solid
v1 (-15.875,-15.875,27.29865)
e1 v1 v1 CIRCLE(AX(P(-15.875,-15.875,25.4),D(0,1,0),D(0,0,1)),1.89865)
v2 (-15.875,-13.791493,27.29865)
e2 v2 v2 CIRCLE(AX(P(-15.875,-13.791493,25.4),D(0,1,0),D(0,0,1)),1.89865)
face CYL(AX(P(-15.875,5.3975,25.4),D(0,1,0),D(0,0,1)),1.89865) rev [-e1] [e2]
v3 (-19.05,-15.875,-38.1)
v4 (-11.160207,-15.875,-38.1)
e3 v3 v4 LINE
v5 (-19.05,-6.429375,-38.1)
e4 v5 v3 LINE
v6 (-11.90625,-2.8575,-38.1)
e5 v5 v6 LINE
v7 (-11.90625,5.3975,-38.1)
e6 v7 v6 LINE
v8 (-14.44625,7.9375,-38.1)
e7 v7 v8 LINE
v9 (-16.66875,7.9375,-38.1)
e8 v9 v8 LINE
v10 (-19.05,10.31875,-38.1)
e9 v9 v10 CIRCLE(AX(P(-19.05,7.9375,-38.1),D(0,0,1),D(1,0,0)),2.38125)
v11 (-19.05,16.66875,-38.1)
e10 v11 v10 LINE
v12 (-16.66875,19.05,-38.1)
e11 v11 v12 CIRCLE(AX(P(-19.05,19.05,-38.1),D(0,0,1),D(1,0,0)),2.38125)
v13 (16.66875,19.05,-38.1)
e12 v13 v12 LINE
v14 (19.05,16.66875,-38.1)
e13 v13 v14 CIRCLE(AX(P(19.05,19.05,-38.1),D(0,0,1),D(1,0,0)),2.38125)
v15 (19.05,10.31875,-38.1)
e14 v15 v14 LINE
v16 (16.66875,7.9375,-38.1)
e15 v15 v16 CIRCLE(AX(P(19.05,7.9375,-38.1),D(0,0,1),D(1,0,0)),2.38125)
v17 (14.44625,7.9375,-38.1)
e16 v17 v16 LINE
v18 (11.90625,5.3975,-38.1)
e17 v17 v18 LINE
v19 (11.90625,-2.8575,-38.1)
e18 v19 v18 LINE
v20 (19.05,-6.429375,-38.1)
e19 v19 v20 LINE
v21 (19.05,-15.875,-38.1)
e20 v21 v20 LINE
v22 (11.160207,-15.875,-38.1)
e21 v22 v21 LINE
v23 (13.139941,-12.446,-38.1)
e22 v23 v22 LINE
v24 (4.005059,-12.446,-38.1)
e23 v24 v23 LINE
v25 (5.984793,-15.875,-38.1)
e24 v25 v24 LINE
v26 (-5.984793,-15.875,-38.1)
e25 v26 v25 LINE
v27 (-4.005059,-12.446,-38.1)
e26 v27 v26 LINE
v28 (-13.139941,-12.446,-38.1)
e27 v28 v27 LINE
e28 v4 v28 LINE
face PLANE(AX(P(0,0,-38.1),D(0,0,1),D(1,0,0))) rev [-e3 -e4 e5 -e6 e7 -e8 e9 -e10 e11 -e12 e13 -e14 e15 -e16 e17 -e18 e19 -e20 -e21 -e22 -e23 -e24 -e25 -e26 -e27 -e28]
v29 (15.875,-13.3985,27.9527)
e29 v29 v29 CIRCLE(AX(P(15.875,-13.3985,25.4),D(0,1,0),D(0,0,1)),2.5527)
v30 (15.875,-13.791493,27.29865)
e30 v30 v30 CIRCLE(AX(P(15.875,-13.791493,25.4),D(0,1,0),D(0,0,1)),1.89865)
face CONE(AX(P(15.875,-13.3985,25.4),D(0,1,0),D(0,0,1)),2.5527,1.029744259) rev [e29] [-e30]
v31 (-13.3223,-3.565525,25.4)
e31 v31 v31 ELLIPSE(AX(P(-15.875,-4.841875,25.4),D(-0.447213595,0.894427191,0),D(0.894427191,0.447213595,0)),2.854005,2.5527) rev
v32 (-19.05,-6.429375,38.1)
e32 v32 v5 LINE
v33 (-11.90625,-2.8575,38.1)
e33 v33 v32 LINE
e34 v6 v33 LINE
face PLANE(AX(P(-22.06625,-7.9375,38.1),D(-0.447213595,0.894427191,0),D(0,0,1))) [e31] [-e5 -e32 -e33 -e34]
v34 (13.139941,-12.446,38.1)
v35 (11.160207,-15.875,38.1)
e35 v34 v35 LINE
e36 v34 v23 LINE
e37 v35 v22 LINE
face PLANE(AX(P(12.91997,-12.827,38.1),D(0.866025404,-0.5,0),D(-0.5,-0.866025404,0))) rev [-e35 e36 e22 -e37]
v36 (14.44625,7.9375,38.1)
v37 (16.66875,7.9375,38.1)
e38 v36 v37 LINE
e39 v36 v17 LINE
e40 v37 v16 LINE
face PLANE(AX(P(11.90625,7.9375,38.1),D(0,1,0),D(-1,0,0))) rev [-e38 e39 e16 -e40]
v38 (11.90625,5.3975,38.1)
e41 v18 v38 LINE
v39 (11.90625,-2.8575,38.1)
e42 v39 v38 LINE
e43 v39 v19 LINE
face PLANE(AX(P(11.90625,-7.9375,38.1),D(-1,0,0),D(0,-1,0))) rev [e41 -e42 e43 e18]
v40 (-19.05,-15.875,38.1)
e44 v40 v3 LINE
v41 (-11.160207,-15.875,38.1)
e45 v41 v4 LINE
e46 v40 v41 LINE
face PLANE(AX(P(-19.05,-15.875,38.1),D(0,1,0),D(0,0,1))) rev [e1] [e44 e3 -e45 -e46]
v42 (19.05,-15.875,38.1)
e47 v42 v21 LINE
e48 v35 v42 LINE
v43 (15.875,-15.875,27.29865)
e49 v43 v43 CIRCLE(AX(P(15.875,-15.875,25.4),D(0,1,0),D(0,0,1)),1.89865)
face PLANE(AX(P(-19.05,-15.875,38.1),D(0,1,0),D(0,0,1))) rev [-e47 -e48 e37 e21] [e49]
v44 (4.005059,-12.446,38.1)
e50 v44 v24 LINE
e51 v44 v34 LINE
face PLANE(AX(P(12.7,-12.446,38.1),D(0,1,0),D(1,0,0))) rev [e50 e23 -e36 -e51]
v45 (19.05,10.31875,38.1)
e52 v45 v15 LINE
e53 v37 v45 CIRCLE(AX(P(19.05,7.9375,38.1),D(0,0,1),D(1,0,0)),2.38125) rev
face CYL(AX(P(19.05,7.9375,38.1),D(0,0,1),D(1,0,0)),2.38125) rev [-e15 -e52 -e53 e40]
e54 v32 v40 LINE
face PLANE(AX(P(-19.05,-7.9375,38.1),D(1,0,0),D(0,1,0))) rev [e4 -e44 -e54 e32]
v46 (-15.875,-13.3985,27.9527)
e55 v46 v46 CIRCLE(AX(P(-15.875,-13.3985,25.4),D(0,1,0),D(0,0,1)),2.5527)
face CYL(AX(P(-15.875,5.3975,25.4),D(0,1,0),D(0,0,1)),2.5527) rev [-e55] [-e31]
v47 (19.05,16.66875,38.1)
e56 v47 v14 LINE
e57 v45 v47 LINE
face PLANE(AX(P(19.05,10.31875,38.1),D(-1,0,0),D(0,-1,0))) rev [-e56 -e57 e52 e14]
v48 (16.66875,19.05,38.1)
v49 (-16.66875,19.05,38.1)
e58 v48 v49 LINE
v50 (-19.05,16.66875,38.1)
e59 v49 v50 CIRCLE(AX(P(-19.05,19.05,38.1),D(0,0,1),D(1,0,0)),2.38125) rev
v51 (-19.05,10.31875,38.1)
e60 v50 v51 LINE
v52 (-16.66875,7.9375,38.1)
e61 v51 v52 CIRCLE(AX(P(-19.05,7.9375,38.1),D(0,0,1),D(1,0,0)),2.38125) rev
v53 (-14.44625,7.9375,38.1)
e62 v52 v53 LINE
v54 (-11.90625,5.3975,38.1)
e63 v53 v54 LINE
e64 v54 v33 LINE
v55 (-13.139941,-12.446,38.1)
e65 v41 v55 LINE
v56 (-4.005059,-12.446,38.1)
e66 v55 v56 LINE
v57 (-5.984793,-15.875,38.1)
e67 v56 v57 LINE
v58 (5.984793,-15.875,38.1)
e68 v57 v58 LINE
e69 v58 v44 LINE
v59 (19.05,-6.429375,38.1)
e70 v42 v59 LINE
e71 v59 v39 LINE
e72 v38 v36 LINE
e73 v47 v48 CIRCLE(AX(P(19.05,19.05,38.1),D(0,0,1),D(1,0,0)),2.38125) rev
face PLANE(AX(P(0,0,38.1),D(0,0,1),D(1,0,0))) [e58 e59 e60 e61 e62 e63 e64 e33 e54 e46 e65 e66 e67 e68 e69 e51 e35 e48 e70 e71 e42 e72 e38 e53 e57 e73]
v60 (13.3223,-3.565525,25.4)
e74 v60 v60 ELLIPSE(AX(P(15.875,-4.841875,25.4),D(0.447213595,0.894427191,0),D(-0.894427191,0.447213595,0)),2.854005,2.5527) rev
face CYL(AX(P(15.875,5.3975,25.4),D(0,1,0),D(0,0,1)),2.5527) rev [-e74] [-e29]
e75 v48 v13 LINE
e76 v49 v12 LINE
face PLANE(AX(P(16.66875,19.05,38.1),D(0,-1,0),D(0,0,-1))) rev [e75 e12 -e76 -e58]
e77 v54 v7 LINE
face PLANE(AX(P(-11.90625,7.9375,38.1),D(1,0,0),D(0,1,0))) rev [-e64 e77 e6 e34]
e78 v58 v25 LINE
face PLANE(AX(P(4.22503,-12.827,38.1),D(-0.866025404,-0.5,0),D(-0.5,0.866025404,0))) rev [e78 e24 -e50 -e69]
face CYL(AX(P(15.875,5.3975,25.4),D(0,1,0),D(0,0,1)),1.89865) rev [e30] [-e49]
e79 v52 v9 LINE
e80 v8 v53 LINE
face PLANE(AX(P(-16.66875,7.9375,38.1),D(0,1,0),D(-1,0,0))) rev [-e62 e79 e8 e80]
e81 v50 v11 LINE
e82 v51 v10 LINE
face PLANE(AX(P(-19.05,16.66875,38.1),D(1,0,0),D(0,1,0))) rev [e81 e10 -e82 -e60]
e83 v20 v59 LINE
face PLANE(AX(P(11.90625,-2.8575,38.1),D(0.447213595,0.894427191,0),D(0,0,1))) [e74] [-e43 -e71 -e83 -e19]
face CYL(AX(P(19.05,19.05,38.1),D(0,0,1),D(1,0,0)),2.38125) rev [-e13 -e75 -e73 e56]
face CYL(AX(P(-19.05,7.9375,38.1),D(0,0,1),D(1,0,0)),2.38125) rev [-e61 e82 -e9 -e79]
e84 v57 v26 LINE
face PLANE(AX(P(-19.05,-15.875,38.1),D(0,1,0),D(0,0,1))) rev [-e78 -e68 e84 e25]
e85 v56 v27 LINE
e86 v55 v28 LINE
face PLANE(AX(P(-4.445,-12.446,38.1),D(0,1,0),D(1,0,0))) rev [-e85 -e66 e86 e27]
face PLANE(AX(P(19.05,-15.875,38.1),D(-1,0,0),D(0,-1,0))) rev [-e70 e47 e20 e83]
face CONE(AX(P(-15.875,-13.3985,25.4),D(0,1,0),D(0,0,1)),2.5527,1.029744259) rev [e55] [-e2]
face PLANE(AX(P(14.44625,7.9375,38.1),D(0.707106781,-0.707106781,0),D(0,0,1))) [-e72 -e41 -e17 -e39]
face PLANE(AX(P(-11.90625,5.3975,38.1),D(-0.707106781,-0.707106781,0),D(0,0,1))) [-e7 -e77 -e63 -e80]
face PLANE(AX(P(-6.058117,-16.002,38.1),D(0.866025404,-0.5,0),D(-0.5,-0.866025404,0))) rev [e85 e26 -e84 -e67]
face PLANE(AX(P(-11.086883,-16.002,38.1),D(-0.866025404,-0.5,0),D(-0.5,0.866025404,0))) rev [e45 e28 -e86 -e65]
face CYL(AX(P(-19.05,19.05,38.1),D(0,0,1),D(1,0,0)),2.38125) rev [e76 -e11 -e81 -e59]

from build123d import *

# Parameters (mm, degrees)
BOSS_EXTRU_1_DEPTH        = 38.1
CONG_1_R                  = 2.38125
CHANFREIN1_SIZE           = 10.16
CHANFREIN1_SIZE_2         = 5.08
CHANFREIN2_SIZE           = 10.16
CHANFREIN2_SIZE_2         = 5.08
CHANFREIN3_SIZE           = 2.54
EMPREINTE1_START          = -38.1
EMPREINTE1_DEPTH          = 76.2
D_PLACER_START            = -38.1
D_PLACER_LA_FACE1_DEPTH   = 76.2
ESQUISSE4_W               = 1.89865
ESQUISSE4_H               = 21.2725
D_GAGEMENT_61_AT_2_COUNT  = 2
D_GAGEMENT_61_AT_2_PITCH  = 31.75
D_GAGEMENT_101_AT_2_COUNT = 2
D_GAGEMENT_101_AT_2_PITCH = 31.75


# Read off the part's stored shape, not the designer's step: Empreinte1, Déplacer la face1
# Some blends are built 0.0001 mm under size
with BuildPart() as part:
    # Esquisse2 → Boss.-Extru.1 (new, symmetric)
    with BuildSketch(Plane.XY):
        Polygon((-19.05, -15.875), (19.05, -15.875), (19.05, -7.9375), (11.90625, -7.9375), (11.90625, 7.9375), (16.66875, 7.9375), (16.66875, 10.31875), (19.05, 10.31875), (19.05, 16.66875), (16.66875, 16.66875), (16.66875, 19.05), (-16.66875, 19.05), (-16.66875, 16.66875), (-19.05, 16.66875), (-19.05, 10.31875), (-16.66875, 10.31875), (-16.66875, 7.9375), (-11.90625, 7.9375), (-11.90625, -7.9375), (-19.05, -7.9375), align=None)
    extrude(amount=BOSS_EXTRU_1_DEPTH, both=True)

    # Congé1
    cong_1_edges = [part.edges().sort_by_distance(p)[0] for p in [
        (-16.66875, 16.66875, 0),
        (-16.66875, 10.31875, 0),
        (16.66875, 10.31875, 0),
        (16.66875, 16.66875, 0),
    ]]
    fillet(cong_1_edges, radius=CONG_1_R - 0.0001)  # a hair under: the kernel refuses the full size

    # Chanfrein1
    # the kernel refuses this chamfer: 10.16, 5.08 mm, written as the material it adds along each edge
    with BuildSketch(Plane(origin=(-11.90625, -7.9375, 38.1), x_dir=(-0.9998508956747119, -0.017268075123668056, 0), z_dir=(0, 0, -1))) as chanfrein1_piece_1_section:
        Polygon((CHANFREIN1_SIZE * 0.999850895675, CHANFREIN1_SIZE * 0.0172680751237), (-CHANFREIN1_SIZE_2 * 0.0172680751237, CHANFREIN1_SIZE_2 * 0.999850895675), (0, 0), align=None)
    chanfrein1_piece_1 = extrude(amount=76.2, mode=Mode.PRIVATE)
    chanfrein1_piece_1 = split(chanfrein1_piece_1, bisect_by=Plane(origin=(-19.05, -6.161924143, 0), z_dir=(1, 0, 0)), keep=Keep.TOP, mode=Mode.PRIVATE)
    add(chanfrein1_piece_1)

    # Chanfrein2
    # the kernel refuses this chamfer: 10.16, 5.08 mm, written as the material it adds along each edge
    with BuildSketch(Plane(origin=(11.90625, -7.9375, -38.1), x_dir=(0.9998508956747119, -0.017268075123668056, 0), z_dir=(0, 0, 1))) as chanfrein2_piece_1_section:
        Polygon((CHANFREIN2_SIZE * 0.999850895675, CHANFREIN2_SIZE * 0.0172680751237), (-CHANFREIN2_SIZE_2 * 0.0172680751237, CHANFREIN2_SIZE_2 * 0.999850895675), (0, 0), align=None)
    chanfrein2_piece_1 = extrude(amount=76.2, mode=Mode.PRIVATE)
    chanfrein2_piece_1 = split(chanfrein2_piece_1, bisect_by=Plane(origin=(19.05, -6.161924143, 0), z_dir=(-1, 0, 0)), keep=Keep.TOP, mode=Mode.PRIVATE)
    add(chanfrein2_piece_1)

    # Chanfrein3
    chanfrein3_edges = [part.edges().sort_by_distance(p)[0] for p in [
        (-11.90625, 7.9375, 0),
        (11.90625, 7.9375, 0),
    ]]
    chamfer(chanfrein3_edges, length=CHANFREIN3_SIZE)

    # Empreinte1 outline → Empreinte1 (cut)
    with BuildSketch(Plane.XY.offset(EMPREINTE1_START)):
        Polygon((-6.278087105, -15.875), (-4.445, -12.7), (-12.7, -12.7), (-10.866912895, -15.875), align=None)
        Polygon((4.445, -12.7), (6.278087105, -15.875), (10.866912895, -15.875), (12.7, -12.7), align=None)
    extrude(amount=EMPREINTE1_DEPTH, mode=Mode.SUBTRACT)

    # Déplacer la face1 outline → Déplacer la face1 (cut)
    with BuildSketch(Plane.XY.offset(D_PLACER_START)):
        Polygon((-5.984793168, -15.875), (-4.005059095, -12.446), (-13.139940905, -12.446), (-11.160206832, -15.875), (-10.866912895, -15.875), (-12.7, -12.7), (-4.445, -12.7), (-6.278087105, -15.875), align=None)
        Polygon((4.005059095, -12.446), (5.984793168, -15.875), (6.278087105, -15.875), (4.445, -12.7), (12.7, -12.7), (10.866912895, -15.875), (11.160206832, -15.875), (13.139940905, -12.446), align=None)
    extrude(amount=D_PLACER_LA_FACE1_DEPTH, mode=Mode.SUBTRACT)

    # Esquisse4 → Dégagement #61 (revolve, cut)
    with BuildSketch(Plane(origin=(-15.875, 5.3975, 25.4), x_dir=(0, 0, 1), z_dir=(1, 0, 0))):
        with Locations((0.949325, 10.63625)):
            Rectangle(ESQUISSE4_W, ESQUISSE4_H)
    d_gagement_61 = revolve(axis=Axis((-15.875, 11.7475, 25.4), (0, -1, 0)), mode=Mode.SUBTRACT)

    # Dégagement #61 at 2: Dégagement #61 ×2
    with Locations(*[(i * D_GAGEMENT_61_AT_2_PITCH, 0, 0) for i in range(1, D_GAGEMENT_61_AT_2_COUNT)]):
        add(d_gagement_61, mode=Mode.SUBTRACT)

    # Esquisse7 → Dégagement #101 (revolve, cut)
    with BuildSketch(Plane(origin=(-15.875, 5.3975, 25.4), x_dir=(0, 0, 1), z_dir=(1, 0, 0))):
        Polygon((0, 0), (0, 20.329816902), (2.5527, 18.796), (2.5527, 0), align=None)
    d_gagement_101 = revolve(axis=Axis((-15.875, 11.7475, 25.4), (0, -1, 0)), mode=Mode.SUBTRACT)

    # Dégagement #101 at 2: Dégagement #101 ×2
    with Locations(*[(i * D_GAGEMENT_101_AT_2_PITCH, 0, 0) for i in range(1, D_GAGEMENT_101_AT_2_COUNT)]):
        add(d_gagement_101, mode=Mode.SUBTRACT)


solid = part.part
